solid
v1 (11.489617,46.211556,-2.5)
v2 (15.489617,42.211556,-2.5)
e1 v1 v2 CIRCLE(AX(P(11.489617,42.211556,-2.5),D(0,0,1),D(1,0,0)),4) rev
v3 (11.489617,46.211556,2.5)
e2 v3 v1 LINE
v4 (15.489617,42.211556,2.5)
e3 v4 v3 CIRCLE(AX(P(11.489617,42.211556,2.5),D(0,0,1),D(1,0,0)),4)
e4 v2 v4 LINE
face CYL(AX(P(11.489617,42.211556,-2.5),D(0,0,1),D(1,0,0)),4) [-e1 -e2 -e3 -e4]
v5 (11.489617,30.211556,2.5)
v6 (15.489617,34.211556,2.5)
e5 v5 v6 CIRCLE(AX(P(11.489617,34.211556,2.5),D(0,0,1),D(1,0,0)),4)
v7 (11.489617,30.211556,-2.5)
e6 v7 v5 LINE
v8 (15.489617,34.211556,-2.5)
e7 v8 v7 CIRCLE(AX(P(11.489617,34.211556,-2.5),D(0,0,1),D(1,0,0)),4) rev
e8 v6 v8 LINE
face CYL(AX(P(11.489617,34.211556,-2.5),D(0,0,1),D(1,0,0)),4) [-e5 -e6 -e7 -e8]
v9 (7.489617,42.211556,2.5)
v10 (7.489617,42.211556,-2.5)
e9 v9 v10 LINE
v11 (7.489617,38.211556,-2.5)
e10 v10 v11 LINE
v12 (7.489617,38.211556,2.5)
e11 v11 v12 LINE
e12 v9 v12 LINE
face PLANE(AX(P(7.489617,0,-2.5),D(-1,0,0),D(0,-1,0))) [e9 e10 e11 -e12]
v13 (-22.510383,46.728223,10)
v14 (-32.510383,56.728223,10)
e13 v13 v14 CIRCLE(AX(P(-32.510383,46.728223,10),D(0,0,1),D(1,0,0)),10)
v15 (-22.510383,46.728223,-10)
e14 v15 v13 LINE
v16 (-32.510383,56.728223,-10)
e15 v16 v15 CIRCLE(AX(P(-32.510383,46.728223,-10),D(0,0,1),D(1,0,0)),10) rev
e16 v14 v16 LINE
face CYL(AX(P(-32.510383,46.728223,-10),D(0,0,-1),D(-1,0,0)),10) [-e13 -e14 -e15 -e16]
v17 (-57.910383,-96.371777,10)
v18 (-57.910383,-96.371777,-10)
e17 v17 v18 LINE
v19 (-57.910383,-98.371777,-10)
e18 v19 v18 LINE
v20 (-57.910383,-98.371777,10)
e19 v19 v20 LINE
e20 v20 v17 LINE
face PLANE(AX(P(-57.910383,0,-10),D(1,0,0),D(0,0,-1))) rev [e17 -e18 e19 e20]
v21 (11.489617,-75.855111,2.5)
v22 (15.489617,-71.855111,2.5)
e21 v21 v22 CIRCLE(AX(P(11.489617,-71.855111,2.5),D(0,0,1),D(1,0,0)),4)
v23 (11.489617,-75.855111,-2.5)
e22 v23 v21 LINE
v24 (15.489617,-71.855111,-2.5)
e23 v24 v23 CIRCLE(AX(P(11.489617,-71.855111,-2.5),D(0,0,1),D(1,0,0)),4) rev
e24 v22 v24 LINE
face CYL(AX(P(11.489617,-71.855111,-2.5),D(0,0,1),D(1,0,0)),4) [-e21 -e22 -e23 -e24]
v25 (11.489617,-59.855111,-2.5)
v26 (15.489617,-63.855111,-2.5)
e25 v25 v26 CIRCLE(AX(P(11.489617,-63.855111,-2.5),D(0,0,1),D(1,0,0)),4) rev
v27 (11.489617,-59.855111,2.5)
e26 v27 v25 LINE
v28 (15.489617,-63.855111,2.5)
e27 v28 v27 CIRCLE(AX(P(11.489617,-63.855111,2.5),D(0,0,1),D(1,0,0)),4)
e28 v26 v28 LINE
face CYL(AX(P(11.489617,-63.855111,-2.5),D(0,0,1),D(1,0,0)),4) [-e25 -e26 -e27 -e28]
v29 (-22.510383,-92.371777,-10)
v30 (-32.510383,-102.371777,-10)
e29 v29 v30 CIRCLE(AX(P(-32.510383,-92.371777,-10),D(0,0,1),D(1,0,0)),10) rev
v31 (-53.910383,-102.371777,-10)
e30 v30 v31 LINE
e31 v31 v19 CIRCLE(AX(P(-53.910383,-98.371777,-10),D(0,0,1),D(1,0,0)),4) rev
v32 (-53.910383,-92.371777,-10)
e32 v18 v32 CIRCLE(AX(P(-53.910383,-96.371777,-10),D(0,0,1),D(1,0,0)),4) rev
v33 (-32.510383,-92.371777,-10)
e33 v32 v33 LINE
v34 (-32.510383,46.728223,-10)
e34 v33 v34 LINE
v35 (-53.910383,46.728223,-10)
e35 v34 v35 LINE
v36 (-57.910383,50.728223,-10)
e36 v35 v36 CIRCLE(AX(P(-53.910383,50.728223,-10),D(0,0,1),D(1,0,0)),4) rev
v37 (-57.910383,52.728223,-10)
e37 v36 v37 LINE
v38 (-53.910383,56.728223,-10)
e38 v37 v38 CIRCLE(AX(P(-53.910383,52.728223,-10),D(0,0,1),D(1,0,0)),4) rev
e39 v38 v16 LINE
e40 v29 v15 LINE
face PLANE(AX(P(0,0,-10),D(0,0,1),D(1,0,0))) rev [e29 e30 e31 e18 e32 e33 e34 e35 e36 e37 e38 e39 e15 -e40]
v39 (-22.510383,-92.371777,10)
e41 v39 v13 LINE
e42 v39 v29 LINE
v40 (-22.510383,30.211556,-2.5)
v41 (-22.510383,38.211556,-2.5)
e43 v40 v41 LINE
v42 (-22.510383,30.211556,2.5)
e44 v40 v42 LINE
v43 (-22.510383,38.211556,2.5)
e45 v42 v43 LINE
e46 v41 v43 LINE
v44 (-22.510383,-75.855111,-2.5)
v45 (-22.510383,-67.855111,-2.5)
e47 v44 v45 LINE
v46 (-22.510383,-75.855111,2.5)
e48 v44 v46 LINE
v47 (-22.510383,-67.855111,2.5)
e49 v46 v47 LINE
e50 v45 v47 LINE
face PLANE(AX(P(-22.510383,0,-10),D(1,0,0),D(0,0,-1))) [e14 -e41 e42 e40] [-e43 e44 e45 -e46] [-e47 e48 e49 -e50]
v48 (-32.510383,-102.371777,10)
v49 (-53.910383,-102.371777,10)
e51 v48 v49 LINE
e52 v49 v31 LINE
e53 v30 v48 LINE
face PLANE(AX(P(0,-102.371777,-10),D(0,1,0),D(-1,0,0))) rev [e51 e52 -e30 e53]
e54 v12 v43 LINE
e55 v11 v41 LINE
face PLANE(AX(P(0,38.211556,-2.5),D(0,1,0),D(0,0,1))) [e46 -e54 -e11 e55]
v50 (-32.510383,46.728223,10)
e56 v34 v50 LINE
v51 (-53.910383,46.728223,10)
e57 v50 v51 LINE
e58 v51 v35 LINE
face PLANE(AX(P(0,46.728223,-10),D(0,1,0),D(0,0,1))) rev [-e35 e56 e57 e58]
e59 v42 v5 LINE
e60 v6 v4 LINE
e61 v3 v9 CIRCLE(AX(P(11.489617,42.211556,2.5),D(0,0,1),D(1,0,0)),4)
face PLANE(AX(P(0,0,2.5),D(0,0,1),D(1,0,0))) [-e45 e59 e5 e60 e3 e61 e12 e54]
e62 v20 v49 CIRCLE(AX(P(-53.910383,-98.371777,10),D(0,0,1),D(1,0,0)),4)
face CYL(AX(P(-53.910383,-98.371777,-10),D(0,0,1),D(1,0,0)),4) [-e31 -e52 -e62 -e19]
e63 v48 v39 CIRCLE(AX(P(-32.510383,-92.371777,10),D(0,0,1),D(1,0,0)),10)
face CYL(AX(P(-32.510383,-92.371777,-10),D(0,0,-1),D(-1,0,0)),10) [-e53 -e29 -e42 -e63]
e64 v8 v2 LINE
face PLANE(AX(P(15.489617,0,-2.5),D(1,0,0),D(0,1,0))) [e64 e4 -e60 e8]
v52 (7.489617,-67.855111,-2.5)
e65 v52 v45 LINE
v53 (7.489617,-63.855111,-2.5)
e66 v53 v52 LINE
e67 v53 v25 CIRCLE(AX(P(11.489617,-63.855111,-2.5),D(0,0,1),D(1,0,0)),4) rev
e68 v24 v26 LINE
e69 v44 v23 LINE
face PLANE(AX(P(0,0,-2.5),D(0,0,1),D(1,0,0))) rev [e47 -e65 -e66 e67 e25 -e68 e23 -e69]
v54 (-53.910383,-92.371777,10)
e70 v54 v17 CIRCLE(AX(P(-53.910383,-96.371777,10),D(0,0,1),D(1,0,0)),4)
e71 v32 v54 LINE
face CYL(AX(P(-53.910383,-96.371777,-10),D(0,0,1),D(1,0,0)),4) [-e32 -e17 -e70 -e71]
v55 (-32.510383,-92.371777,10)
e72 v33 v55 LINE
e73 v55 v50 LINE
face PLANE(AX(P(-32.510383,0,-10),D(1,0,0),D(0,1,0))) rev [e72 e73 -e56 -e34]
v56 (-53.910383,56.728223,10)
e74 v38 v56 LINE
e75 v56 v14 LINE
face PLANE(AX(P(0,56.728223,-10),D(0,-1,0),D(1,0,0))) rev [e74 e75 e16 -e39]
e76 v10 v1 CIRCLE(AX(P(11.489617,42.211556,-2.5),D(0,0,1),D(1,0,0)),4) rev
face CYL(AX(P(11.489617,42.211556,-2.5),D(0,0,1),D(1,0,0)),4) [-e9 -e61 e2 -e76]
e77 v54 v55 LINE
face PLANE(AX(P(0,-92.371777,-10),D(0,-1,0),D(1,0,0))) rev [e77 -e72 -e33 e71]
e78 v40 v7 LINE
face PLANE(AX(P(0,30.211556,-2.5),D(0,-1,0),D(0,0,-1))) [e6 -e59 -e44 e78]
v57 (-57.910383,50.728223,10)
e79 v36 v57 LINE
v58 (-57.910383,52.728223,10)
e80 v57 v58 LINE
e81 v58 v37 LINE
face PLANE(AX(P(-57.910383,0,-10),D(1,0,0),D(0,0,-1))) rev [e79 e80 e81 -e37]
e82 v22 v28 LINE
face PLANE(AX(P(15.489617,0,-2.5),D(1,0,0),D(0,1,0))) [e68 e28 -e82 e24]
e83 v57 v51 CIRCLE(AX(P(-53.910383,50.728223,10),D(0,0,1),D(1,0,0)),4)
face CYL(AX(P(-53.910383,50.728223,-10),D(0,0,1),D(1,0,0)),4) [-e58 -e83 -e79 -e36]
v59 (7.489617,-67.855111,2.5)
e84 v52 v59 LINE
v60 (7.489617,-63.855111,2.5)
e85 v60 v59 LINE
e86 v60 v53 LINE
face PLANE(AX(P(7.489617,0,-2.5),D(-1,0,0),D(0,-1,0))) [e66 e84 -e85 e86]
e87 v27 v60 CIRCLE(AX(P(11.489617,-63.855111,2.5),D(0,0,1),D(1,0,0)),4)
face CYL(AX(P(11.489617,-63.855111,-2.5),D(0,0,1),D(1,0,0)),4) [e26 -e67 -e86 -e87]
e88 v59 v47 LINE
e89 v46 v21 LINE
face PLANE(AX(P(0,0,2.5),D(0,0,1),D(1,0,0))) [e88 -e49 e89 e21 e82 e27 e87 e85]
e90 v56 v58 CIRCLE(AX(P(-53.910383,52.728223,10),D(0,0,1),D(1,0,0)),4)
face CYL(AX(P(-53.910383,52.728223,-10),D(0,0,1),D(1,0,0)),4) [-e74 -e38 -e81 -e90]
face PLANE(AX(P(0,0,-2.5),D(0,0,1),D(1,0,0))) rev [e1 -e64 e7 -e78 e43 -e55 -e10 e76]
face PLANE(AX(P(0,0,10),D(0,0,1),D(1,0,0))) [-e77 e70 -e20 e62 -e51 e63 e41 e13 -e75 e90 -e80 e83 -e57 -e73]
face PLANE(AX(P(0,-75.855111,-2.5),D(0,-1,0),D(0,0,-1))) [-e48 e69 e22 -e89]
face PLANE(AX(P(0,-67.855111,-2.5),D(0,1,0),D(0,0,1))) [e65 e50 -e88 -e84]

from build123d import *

# Parameters (mm, degrees)
BOSS_EXTRUDE1_DEPTH      = 10
BOSS_EXTRUDE1_DEPTH_BACK = 10
BOSS_EXTRUDE2_DEPTH      = 2.5
BOSS_EXTRUDE2_DEPTH_BACK = 2.5
FILLET1_R                = 10
FILLET2_R                = 4
FILLET3_R                = 4


with BuildPart() as part:
    # Sketch1 → Boss-Extrude1 (new, two sides: drawn at the far end of the back side and taken through both)
    with BuildSketch(Plane.XY.offset(-BOSS_EXTRUDE1_DEPTH_BACK)):
        Polygon((-22.510382525, 3.694889185), (-22.510382525, 30.211555852), (-22.510382525, 56.728222519), (-57.910382525, 56.728222519), (-57.910382525, 46.728222519), (-32.510382525, 46.728222519), (-32.510382525, -92.371777481), (-57.910382525, -92.371777481), (-57.910382525, -102.371777481), (-22.510382525, -102.371777481), (-22.510382525, -75.855110815), (-22.510382525, -49.338444148), (-22.510382525, -22.821777481), align=None)
    extrude(amount=BOSS_EXTRUDE1_DEPTH + BOSS_EXTRUDE1_DEPTH_BACK)

    # Sketch1<3> → Boss-Extrude2 (add, two sides: drawn at the far end of the back side and taken through both)
    with BuildSketch(Plane.XY.offset(-BOSS_EXTRUDE2_DEPTH_BACK)):
        Polygon((7.489617475, 38.211555852), (-22.510382525, 38.211555852), (-22.510382525, 30.211555852), (15.489617475, 30.211555852), (15.489617475, 46.211555852), (7.489617475, 46.211555852), align=None)
        Polygon((7.489617475, -67.855110815), (-22.510382525, -67.855110815), (-22.510382525, -75.855110815), (15.489617475, -75.855110815), (15.489617475, -59.855110815), (7.489617475, -59.855110815), align=None)
    extrude(amount=BOSS_EXTRUDE2_DEPTH + BOSS_EXTRUDE2_DEPTH_BACK)

    # Fillet1
    fillet1_edges = [part.edges().sort_by_distance(p)[0] for p in [
        (-22.510382525, -102.371777481, 0),
        (-22.510382525, 56.728222519, 0),
    ]]
    fillet(fillet1_edges, radius=FILLET1_R)

    # Fillet2
    fillet2_edges = [part.edges().sort_by_distance(p)[0] for p in [
        (-57.910382525, -102.371777481, 0),
        (-57.910382525, -92.371777481, 0),
        (7.489617475, -59.855110815, 0),
        (15.489617475, -59.855110815, 0),
        (15.489617475, -75.855110815, 0),
        (7.489617475, 46.211555852, 0),
        (15.489617475, 46.211555852, 0),
        (15.489617475, 30.211555852, 0),
        (-57.910382525, 56.728222519, 0),
    ]]
    fillet(fillet2_edges, radius=FILLET2_R - 0.0001)  # a hair under: the kernel refuses the full size

    # Fillet3
    fillet3_edges = [part.edges().sort_by_distance(p)[0] for p in [
        (-57.910382525, 46.728222519, 0),
    ]]
    fillet(fillet3_edges, radius=FILLET3_R)


solid = part.part
